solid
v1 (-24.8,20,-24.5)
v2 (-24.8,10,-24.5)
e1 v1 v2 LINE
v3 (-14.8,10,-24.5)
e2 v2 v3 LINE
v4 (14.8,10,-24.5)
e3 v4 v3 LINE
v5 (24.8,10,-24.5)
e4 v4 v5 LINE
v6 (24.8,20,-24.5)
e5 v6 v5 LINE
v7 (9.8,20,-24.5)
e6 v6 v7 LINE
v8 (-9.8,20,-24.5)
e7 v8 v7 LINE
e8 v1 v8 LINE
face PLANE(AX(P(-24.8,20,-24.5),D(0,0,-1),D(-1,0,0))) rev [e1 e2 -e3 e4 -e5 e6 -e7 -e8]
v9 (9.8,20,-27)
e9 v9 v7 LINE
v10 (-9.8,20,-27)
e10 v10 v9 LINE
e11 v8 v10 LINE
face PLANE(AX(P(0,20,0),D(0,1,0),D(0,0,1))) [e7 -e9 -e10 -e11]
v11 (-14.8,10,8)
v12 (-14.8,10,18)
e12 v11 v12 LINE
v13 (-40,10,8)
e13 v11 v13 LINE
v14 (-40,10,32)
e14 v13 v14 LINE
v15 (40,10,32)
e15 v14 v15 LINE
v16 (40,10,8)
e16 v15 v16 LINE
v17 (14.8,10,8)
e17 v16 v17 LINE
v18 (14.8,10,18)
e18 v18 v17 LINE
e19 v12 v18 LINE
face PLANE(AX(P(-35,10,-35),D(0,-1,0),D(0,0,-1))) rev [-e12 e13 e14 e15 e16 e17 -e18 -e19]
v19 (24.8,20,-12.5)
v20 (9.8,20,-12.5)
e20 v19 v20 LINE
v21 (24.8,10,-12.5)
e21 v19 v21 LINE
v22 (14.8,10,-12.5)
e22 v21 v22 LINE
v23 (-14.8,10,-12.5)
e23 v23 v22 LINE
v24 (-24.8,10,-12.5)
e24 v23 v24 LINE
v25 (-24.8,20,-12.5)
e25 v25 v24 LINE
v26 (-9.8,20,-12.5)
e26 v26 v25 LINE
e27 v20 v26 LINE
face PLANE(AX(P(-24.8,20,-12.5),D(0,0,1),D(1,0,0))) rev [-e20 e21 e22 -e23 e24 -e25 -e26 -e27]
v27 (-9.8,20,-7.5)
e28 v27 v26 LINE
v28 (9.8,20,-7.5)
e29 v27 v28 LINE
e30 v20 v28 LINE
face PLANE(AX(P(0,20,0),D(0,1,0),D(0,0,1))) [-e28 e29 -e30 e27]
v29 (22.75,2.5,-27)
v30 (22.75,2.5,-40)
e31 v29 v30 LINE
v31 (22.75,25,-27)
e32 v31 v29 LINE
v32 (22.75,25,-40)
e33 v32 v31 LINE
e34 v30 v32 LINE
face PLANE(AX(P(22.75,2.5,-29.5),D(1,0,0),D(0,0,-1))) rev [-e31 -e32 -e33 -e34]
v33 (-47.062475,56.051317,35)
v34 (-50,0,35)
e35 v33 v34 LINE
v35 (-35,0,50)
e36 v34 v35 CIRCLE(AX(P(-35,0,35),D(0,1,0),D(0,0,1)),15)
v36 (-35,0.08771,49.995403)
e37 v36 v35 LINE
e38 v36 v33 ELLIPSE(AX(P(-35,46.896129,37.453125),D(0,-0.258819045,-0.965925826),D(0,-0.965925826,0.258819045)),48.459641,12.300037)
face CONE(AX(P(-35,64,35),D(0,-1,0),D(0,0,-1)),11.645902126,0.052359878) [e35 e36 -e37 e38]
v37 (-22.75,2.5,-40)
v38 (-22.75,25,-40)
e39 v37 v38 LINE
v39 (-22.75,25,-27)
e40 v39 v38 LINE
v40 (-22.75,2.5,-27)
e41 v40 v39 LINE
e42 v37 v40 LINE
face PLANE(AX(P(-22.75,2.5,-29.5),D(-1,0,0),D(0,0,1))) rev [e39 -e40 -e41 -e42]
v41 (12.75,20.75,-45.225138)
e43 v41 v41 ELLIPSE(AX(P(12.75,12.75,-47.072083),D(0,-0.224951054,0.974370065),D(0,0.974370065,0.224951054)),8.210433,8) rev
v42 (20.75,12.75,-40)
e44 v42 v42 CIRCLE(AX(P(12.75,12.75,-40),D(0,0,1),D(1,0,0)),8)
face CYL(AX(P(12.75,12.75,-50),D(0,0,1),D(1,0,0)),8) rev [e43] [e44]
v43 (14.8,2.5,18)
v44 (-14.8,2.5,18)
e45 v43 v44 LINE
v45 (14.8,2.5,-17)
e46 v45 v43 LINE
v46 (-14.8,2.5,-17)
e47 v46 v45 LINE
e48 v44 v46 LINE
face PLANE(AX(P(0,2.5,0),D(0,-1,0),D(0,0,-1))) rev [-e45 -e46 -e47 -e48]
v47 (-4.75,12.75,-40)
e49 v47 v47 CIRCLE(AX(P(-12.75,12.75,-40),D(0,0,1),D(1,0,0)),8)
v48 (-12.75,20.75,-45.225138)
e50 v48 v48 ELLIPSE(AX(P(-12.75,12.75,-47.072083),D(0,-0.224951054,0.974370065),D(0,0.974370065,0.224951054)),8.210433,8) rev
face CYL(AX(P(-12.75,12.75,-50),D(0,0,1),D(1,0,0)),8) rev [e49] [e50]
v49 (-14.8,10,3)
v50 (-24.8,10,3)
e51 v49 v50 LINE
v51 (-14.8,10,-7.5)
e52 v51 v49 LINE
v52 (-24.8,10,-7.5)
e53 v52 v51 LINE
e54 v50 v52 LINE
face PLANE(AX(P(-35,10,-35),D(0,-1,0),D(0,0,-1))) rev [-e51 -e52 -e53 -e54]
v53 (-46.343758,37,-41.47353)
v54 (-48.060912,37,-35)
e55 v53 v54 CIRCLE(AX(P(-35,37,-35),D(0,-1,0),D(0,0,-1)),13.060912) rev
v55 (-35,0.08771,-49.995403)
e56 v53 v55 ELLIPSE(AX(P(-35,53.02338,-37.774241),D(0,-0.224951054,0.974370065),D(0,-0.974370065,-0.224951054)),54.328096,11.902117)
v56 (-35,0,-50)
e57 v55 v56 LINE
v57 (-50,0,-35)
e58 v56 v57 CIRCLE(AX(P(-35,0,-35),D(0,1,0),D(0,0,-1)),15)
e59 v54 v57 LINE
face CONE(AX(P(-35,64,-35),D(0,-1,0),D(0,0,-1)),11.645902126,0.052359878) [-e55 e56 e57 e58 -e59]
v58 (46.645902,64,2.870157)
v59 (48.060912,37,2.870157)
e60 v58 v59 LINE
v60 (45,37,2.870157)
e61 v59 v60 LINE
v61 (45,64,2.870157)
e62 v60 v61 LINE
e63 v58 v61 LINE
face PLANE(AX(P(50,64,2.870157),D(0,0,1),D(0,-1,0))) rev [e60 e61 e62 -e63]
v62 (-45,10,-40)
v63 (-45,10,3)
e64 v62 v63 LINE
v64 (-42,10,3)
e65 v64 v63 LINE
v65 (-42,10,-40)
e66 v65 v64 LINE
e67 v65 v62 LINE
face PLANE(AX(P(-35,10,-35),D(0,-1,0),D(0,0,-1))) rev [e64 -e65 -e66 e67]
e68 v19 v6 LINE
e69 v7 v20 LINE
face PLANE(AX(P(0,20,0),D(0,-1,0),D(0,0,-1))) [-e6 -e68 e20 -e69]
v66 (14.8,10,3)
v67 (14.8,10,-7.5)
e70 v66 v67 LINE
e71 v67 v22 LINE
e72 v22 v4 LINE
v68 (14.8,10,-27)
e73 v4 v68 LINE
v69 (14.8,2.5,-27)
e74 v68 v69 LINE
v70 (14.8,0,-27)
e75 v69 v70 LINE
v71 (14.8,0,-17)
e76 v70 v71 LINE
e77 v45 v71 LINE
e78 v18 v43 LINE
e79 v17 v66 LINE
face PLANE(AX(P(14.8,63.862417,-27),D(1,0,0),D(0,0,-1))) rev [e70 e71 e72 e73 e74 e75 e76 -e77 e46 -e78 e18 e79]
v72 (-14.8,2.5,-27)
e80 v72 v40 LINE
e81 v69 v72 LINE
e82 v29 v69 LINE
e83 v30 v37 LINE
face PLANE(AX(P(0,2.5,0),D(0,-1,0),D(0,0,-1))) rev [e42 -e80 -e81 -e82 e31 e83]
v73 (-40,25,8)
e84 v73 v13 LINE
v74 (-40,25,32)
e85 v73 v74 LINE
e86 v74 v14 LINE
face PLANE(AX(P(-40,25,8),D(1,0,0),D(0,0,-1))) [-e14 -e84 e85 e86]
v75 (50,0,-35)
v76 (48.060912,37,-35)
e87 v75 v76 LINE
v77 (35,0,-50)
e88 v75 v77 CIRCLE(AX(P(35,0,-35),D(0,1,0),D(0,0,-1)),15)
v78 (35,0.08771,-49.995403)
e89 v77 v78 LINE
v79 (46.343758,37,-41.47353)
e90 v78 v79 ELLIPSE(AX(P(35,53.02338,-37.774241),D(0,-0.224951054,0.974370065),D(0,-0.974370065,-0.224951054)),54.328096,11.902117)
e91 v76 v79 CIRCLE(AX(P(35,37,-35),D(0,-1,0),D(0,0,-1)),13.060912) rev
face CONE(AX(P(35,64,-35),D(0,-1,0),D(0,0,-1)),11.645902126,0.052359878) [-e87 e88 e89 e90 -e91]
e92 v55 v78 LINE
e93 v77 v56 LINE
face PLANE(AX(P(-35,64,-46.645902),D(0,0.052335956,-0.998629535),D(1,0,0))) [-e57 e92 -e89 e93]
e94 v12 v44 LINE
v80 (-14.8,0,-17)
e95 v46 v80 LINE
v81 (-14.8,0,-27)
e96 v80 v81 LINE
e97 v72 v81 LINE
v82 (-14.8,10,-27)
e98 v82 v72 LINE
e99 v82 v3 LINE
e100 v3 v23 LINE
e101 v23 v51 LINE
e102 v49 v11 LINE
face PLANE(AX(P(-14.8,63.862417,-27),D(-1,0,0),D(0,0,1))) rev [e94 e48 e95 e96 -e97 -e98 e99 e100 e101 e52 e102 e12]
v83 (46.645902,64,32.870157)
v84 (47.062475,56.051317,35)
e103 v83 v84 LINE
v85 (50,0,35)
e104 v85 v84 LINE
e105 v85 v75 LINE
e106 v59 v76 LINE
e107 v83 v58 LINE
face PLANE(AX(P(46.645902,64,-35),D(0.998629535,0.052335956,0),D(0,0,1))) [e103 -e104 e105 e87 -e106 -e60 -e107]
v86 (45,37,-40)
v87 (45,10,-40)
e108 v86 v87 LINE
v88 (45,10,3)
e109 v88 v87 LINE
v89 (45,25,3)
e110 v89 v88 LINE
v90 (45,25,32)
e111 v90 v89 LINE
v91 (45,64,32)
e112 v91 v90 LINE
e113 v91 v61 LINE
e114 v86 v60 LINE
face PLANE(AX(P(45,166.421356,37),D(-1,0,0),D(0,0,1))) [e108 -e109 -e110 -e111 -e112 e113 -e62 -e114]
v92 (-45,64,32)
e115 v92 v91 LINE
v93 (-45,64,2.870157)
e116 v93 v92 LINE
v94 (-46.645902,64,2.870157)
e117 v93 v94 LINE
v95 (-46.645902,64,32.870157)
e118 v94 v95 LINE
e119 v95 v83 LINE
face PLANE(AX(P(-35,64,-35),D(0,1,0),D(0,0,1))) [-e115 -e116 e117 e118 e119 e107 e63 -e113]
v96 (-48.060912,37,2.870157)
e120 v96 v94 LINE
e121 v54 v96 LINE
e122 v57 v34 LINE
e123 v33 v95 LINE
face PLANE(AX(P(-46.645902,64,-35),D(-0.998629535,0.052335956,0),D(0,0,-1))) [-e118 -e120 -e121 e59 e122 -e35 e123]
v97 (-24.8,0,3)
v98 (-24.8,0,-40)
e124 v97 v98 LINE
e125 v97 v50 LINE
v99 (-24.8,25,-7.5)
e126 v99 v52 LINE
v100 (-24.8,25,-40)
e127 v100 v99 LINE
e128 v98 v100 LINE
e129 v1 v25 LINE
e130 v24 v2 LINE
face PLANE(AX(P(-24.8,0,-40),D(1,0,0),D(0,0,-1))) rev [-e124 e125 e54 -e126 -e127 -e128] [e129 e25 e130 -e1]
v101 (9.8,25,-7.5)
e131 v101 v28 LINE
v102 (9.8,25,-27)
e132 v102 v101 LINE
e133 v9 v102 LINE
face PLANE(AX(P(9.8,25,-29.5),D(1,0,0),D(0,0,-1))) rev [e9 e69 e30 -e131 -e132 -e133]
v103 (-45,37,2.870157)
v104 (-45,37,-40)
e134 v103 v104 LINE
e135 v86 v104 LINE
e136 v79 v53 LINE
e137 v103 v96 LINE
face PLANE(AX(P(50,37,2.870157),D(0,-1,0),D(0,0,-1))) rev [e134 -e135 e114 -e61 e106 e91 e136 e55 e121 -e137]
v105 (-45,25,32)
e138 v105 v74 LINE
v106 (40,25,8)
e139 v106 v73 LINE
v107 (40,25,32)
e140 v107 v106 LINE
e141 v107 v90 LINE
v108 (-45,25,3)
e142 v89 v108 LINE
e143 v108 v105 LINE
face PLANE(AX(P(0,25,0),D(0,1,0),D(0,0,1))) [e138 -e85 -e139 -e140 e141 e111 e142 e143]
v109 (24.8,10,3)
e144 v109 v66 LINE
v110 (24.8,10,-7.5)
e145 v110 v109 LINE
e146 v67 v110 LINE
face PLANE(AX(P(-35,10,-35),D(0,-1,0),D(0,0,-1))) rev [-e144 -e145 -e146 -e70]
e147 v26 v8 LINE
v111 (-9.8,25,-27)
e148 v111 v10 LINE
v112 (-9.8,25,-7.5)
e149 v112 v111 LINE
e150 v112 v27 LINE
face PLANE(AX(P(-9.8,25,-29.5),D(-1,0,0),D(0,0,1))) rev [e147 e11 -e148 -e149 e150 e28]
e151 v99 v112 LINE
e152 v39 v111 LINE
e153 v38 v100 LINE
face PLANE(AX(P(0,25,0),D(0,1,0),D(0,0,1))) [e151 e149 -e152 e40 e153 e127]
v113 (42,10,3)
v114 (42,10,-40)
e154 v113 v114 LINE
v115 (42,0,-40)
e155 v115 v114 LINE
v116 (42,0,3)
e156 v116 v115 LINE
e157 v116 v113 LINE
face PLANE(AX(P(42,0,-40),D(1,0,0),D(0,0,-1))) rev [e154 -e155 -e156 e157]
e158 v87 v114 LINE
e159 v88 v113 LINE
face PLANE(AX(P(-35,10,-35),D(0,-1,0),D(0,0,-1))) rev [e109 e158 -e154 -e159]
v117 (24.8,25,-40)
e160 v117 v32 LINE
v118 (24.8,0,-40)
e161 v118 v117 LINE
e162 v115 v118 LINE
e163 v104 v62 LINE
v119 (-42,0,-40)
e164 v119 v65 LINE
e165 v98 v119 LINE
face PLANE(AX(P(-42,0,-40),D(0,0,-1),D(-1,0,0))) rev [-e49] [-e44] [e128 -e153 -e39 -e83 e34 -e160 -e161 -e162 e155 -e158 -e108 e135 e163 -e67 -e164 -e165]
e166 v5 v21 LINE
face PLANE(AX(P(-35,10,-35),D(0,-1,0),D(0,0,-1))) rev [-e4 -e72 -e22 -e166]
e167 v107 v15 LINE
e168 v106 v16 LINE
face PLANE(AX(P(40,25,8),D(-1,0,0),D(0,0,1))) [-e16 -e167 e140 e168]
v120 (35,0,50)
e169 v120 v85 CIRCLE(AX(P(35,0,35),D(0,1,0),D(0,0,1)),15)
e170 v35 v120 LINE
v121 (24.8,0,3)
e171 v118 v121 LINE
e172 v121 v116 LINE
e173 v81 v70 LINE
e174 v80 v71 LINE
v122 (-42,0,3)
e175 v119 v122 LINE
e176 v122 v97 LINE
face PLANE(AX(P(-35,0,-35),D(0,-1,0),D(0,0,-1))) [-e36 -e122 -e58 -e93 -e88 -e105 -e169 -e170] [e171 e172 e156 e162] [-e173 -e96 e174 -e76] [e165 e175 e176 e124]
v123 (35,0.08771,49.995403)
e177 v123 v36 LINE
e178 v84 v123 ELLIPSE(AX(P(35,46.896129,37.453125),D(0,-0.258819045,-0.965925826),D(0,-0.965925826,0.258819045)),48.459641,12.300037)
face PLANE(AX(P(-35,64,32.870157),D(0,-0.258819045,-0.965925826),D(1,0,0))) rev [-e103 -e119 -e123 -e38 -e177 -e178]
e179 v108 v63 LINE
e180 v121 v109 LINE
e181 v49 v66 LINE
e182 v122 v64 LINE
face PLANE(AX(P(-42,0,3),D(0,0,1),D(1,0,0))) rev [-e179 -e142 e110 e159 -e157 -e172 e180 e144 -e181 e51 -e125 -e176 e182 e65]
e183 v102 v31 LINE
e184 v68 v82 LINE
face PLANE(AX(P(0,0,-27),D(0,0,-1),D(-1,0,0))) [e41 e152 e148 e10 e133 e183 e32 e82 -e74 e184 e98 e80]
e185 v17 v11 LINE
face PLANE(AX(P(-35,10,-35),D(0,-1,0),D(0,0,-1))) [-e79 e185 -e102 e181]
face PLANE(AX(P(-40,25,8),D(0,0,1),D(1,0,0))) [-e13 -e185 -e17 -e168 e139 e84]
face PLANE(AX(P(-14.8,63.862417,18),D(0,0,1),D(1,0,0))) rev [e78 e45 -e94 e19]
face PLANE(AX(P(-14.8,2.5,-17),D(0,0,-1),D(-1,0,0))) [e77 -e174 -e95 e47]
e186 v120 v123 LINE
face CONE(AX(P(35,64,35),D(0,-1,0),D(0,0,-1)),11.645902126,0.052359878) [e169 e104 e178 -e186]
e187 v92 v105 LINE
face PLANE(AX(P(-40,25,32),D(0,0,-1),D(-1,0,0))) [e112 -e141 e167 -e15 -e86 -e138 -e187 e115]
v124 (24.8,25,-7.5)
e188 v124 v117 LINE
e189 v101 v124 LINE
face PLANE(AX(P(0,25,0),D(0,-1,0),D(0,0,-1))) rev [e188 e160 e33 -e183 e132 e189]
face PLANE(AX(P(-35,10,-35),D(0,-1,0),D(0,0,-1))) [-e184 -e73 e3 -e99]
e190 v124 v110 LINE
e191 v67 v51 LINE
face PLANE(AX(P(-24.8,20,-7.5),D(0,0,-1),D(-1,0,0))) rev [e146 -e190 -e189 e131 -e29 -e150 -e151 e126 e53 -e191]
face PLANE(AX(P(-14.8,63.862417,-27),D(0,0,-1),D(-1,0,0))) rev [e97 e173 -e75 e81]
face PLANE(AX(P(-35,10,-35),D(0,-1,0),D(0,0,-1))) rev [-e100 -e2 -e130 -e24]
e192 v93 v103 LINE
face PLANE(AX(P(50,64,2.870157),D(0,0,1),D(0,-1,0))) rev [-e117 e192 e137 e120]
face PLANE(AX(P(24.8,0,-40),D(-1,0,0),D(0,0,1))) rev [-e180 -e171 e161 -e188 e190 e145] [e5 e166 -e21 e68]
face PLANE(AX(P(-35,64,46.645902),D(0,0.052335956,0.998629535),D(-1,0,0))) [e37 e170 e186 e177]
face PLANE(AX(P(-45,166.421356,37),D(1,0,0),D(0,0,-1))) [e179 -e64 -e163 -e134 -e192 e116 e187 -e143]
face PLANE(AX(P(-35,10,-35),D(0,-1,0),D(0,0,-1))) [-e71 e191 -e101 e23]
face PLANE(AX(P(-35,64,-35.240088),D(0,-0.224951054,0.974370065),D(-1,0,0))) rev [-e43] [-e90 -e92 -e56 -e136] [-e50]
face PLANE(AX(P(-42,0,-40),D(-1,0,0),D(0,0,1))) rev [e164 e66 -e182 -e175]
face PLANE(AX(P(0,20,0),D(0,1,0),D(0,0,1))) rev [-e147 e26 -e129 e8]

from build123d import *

# Parameters (mm, degrees)
BOSS_EXTRUDE1_DEPTH     = 10
SKETCH2_W               = 17.2
SKETCH2_H               = 43
CUT_EXTRUDE1_DEPTH      = 72.414284285
SKETCH3_W               = 90
SKETCH3_H               = 34
SKETCH3_W_2             = 80
SKETCH3_H_2             = 24
BOSS_EXTRUDE3_DEPTH     = 15
SKETCH4_W               = 49.6
SKETCH4_H               = 5
BOSS_EXTRUDE4_DEPTH     = 10
SKETCH5_W               = 15
SKETCH5_H               = 22
BOSS_EXTRUDE5_DEPTH     = 5
SKETCH6_W               = 90
SKETCH6_H               = 77
BOSS_EXTRUDE6_DEPTH     = 15
BOSS_EXTRUDE8_DEPTH     = 39
CHAMFER1_SIZE           = 64
CHAMFER1_SIZE_2         = 3.354097874
CHAMFER2_SIZE           = 64
CHAMFER2_SIZE_2         = 11.405813635
CHAMFER3_SIZE           = 64
CHAMFER3_SIZE_2         = 13.775745352
CUT_EXTRUDE3_DEPTH      = 95.500525601
CUT_EXTRUDE3_DEPTH_BACK = 95.500525601
SKETCH10_W              = 50
SKETCH10_H              = 27
SKETCH11_W              = 45.5
SKETCH11_H              = 10.5
CUT_EXTRUDE4_DEPTH      = 7.5
SKETCH14_W              = 2.05
SKETCH14_H              = 10.5
BOSS_EXTRUDE9_DEPTH     = 15
SKETCH15_R              = 8
CUT_EXTRUDE5_DEPTH      = 122.227059686
CUT_EXTRUDE6_DEPTH      = 2.5
CUT_EXTRUDE7_REACH      = 97.373
SKETCH18_W              = 29.6
SKETCH18_H              = 45
CUT_EXTRUDE8_DEPTH      = 15
SKETCH21_W              = 29.6
SKETCH21_H              = 35
BOSS_EXTRUDE10_DEPTH    = 2.5


with BuildPart() as part:
    # Sketch1 → Boss-Extrude1 (new body)
    with BuildSketch(Plane(origin=(0, 0, 0), x_dir=(1, 0, 0), z_dir=(0, 1, 0))):
        with BuildLine():
            Line((-35, 50), (35, 50))
            ThreePointArc((35, 50), (45.606601718, 45.606601718), (50, 35))
            Line((50, 35), (50, -35))
            ThreePointArc((50, -35), (45.606601718, -45.606601718), (35, -50))
            Line((35, -50), (-35, -50))
            ThreePointArc((-35, -50), (-45.606601718, -45.606601718), (-50, -35))
            Line((-50, -35), (-50, 35))
            ThreePointArc((-50, 35), (-45.606601718, 45.606601718), (-35, 50))
        make_face()
    extrude(amount=BOSS_EXTRUDE1_DEPTH)

    # Sketch2 → Cut-Extrude1 (cut, through all)
    with BuildSketch(Plane(origin=(0, 10, 0), x_dir=(1, 0, 0), z_dir=(0, 1, 0))):
        with Locations((-33.4, 18.5)):
            Rectangle(SKETCH2_W, SKETCH2_H)
        with Locations((33.4, 18.5)):
            Rectangle(SKETCH2_W, SKETCH2_H)
    extrude(amount=-CUT_EXTRUDE1_DEPTH, mode=Mode.SUBTRACT)

    # Sketch3 → Boss-Extrude3 (add)
    with BuildSketch(Plane(origin=(0, 10, 0), x_dir=(1, 0, 0), z_dir=(0, 1, 0))):
        with Locations((0, -20)):
            Rectangle(SKETCH3_W, SKETCH3_H)
        with Locations((0, -20)):
            Rectangle(SKETCH3_W_2, SKETCH3_H_2, mode=Mode.SUBTRACT)
    extrude(amount=BOSS_EXTRUDE3_DEPTH)

    # Sketch4 → Boss-Extrude4 (add)
    with BuildSketch(Plane(origin=(0, 10, 0), x_dir=(1, 0, 0), z_dir=(0, 1, 0))):
        with Locations((0, 10)):
            Rectangle(SKETCH4_W, SKETCH4_H)
        with Locations((0, 27)):
            Rectangle(SKETCH4_W, SKETCH4_H)
    extrude(amount=BOSS_EXTRUDE4_DEPTH)

    # Sketch5 → Boss-Extrude5 (add)
    with BuildSketch(Plane(origin=(0, 20, 0), x_dir=(1, 0, 0), z_dir=(0, 1, 0))):
        with Locations((-17.3, 18.5)):
            Rectangle(SKETCH5_W, SKETCH5_H)
        with Locations((17.3, 18.5)):
            Rectangle(SKETCH5_W, SKETCH5_H)
    extrude(amount=BOSS_EXTRUDE5_DEPTH)

    # Sketch6 → Boss-Extrude6 (add)
    with BuildSketch(Plane(origin=(0, 10, 0), x_dir=(1, 0, 0), z_dir=(0, 1, 0))):
        with BuildLine():
            Line((-50, 35), (-50, -35))
            ThreePointArc((-50, -35), (-45.606601718, -45.606601718), (-35, -50))
            Line((-35, -50), (35, -50))
            ThreePointArc((35, -50), (45.606601718, -45.606601718), (50, -35))
            Line((50, -35), (50, 35))
            ThreePointArc((50, 35), (45.606601718, 45.606601718), (35, 50))
            Line((35, 50), (-35, 50))
            ThreePointArc((-35, 50), (-45.606601718, 45.606601718), (-50, 35))
        make_face()
        with Locations((0, 1.5)):
            Rectangle(SKETCH6_W, SKETCH6_H, mode=Mode.SUBTRACT)
    extrude(amount=BOSS_EXTRUDE6_DEPTH)

    # Sketch9 → Boss-Extrude8 (add)
    with BuildSketch(Plane(origin=(0, 25, 0), x_dir=(1, 0, 0), z_dir=(0, 1, 0))):
        with BuildLine():
            Line((-50, 35), (-50, -35))
            ThreePointArc((-50, -35), (-45.606601718, -45.606601718), (-35, -50))
            Line((-35, -50), (35, -50))
            ThreePointArc((35, -50), (45.606601718, -45.606601718), (50, -35))
            Line((50, -35), (50, 35))
            ThreePointArc((50, 35), (45.606601718, 45.606601718), (35, 50))
            Line((35, 50), (-35, 50))
            ThreePointArc((-35, 50), (-45.606601718, 45.606601718), (-50, 35))
        make_face()
        with BuildLine():
            Line((-45, 35), (-45, -32))
            Line((-45, -32), (45, -32))
            Line((45, -32), (45, 35))
            ThreePointArc((45, 35), (44.659258263, 37.588190451), (43.660254038, 40))
            Line((43.660254038, 40), (-43.660254038, 40))
            ThreePointArc((-43.660254038, 40), (-44.659258263, 37.588190451), (-45, 35))
        make_face(mode=Mode.SUBTRACT)
    extrude(amount=BOSS_EXTRUDE8_DEPTH)

    # Chamfer1
    # the kernel refuses this chamfer: 64, 3.354097874 mm, written as the material it takes off along each edge
    with BuildSketch(Plane(origin=(-35, 64, 50), x_dir=(0, -0.9999979738662979, 0.002013023422382214), z_dir=(1, 0, 0)), Plane(origin=(50, 64, 35), x_dir=(0.002013023422382214, -0.9999979738662979, 0), z_dir=(0, 0, -1)), Plane(origin=(-50, 64, -35), x_dir=(-0.002013023422382214, -0.9999979738662979, 0), z_dir=(0, 0, 1)), Plane(origin=(35, 64, -50), x_dir=(0, -0.9999979738662979, -0.002013023422382214), z_dir=(-1, 0, 0))) as chamfer1_piece_1:
        Polygon((CHAMFER1_SIZE * 0.999997973866, CHAMFER1_SIZE * 0.00201302342238), (-CHAMFER1_SIZE_2 * 0.00201302342245, CHAMFER1_SIZE_2 * 0.9999979739), (0, 0), align=None)
    extrude(amount=70, mode=Mode.SUBTRACT)
    with BuildSketch(Plane(origin=(35, 64, 35), x_dir=(0, 0, 1), z_dir=(-1, 0, 0))) as chamfer1_piece_2:
        Polygon((15, -CHAMFER1_SIZE), (15 - CHAMFER1_SIZE_2, 0), (15, 0), align=None)
    revolve(axis=Axis((35, 64, 35), (0, 1, 0)), revolution_arc=90, mode=Mode.SUBTRACT)
    with BuildSketch(Plane(origin=(-35, 64, 35), x_dir=(-1, 0, 0), z_dir=(0, 0, -1))) as chamfer1_piece_3:
        Polygon((15, -CHAMFER1_SIZE), (15 - CHAMFER1_SIZE_2, 0), (15, 0), align=None)
    revolve(axis=Axis((-35, 64, 35), (0, 1, 0)), revolution_arc=90, mode=Mode.SUBTRACT)
    with BuildSketch(Plane(origin=(35, 64, -35), x_dir=(1, 0, 0), z_dir=(0, 0, 1))) as chamfer1_piece_4:
        Polygon((15, -CHAMFER1_SIZE), (15 - CHAMFER1_SIZE_2, 0), (15, 0), align=None)
    revolve(axis=Axis((35, 64, -35), (0, 1, 0)), revolution_arc=90, mode=Mode.SUBTRACT)
    with BuildSketch(Plane(origin=(-35, 64, -35), x_dir=(0, 0, -1), z_dir=(1, 0, 0))) as chamfer1_piece_5:
        Polygon((15 - CHAMFER1_SIZE_2, 0), (15, -CHAMFER1_SIZE), (15, 0), align=None)
    revolve(axis=Axis((-35, 64, -35), (0, 1, 0)), revolution_arc=90, mode=Mode.SUBTRACT)

    # Chamfer2
    # the kernel refuses this chamfer: 64, 11.405813635 mm, written as the material it takes off along each edge
    with BuildSketch(Plane(origin=(201.306482971, 64, -46.645902126), x_dir=(0, -0.9982575003065525, -0.05900816114499234), z_dir=(-1, 0, 0))) as chamfer2_piece_1:
        Polygon((CHAMFER2_SIZE * 0.999977671636, CHAMFER2_SIZE * 0.0066825316561), (-CHAMFER2_SIZE_2 * 0.0590081611462, CHAMFER2_SIZE_2 * 0.998257500326), (0, 0), align=None)
    extrude(amount=402.612965942, mode=Mode.SUBTRACT)

    # Chamfer3
    # the kernel refuses this chamfer: 64, 13.775745352 mm, written as the material it takes off along each edge
    with BuildSketch(Plane(origin=(-201.265469314, 64, 46.645902126), x_dir=(0, -0.9981787050157903, 0.06032638604292662), z_dir=(1, 0, 0))) as chamfer3_piece_1:
        Polygon((CHAMFER3_SIZE * 0.999967974892, CHAMFER3_SIZE * 0.00800307379952), (-CHAMFER3_SIZE_2 * 0.060326386045, CHAMFER3_SIZE_2 * 0.99817870505), (0, 0), align=None)
    extrude(amount=402.530938629, mode=Mode.SUBTRACT)

    # Sketch10 → Cut-Extrude3 (cut, two sides: drawn at the far end of the back side and taken through both)
    with BuildSketch(Plane(origin=(0, 1.307501734, 0), x_dir=(0, 0, 1), z_dir=(-1, 0, 0)).offset(-CUT_EXTRUDE3_DEPTH_BACK)):
        with Locations((-22.129843227, 49.192498266)):
            Rectangle(SKETCH10_W, SKETCH10_H)
    extrude(amount=CUT_EXTRUDE3_DEPTH + CUT_EXTRUDE3_DEPTH_BACK, mode=Mode.SUBTRACT)

    # Sketch11 → Cut-Extrude4 (cut)
    with BuildSketch(Plane(origin=(0, 10, 0), x_dir=(1, 0, 0), z_dir=(0, 1, 0))):
        with Locations((0, 34.75)):
            Rectangle(SKETCH11_W, SKETCH11_H)
    extrude(amount=-CUT_EXTRUDE4_DEPTH, mode=Mode.SUBTRACT)

    # Sketch14 → Boss-Extrude9 (add)
    with BuildSketch(Plane(origin=(0, 10, 0), x_dir=(1, 0, 0), z_dir=(0, 1, 0))):
        with Locations((-23.775, 34.75)):
            Rectangle(SKETCH14_W, SKETCH14_H)
        with Locations((23.775, 34.75)):
            Rectangle(SKETCH14_W, SKETCH14_H)
    extrude(amount=BOSS_EXTRUDE9_DEPTH)

    # Sketch15 → Cut-Extrude5 (cut, through all)
    with BuildSketch(Plane.XY.offset(-40)):
        with Locations((-12.75, 12.75)):
            Circle(SKETCH15_R)
        with Locations((12.75, 12.75)):
            Circle(SKETCH15_R)
    extrude(amount=-CUT_EXTRUDE5_DEPTH, mode=Mode.SUBTRACT)

    # Sketch17 → Cut-Extrude6 (cut)
    with BuildSketch(Plane(origin=(0, 0, -29.5), x_dir=(-1, 0, 0), z_dir=(0, 0, -1))):
        Polygon((-9.8, 25), (-22.75, 25), (-22.75, 2.5), (22.75, 2.5), (22.75, 25), (9.8, 25), (9.8, 20), (-9.8, 20), align=None)
    extrude(amount=-CUT_EXTRUDE6_DEPTH, mode=Mode.SUBTRACT)

    # Cut-Extrude7: up to this face of the body (flat: up to its plane)
    cut_extrude7_end = Plane(part.part.faces().sort_by_distance((0, 10, -18.5))[0])
    # Sketch18 → Cut-Extrude7 (cut, up to the picked face)
    with BuildSketch(Plane.XZ, mode=Mode.PRIVATE) as cut_extrude7_sk1:
        with Locations((0, -4.5)):
            Rectangle(SKETCH18_W, SKETCH18_H)
    cut_extrude7_tool1 = split(extrude(cut_extrude7_sk1.sketch, amount=-CUT_EXTRUDE7_REACH, mode=Mode.PRIVATE), bisect_by=cut_extrude7_end, keep=Keep.BOTH, mode=Mode.PRIVATE)
    add(cut_extrude7_tool1.solids().sort_by(Axis((0, 0, -4.5), (0, 1, 0)))[0], mode=Mode.SUBTRACT)

    # Sketch20 → Cut-Extrude8 (cut)
    with BuildSketch(Plane.XZ.offset(-25)):
        with BuildLine():
            Line((-45, -35), (-45, -40))
            Line((-45, -40), (-43.660254038, -40))
            ThreePointArc((-43.660254038, -40), (-44.659258263, -37.588190451), (-45, -35))
        make_face()
        with BuildLine():
            Line((45, -40), (45, -35))
            ThreePointArc((45, -35), (44.659258263, -37.588190451), (43.660254038, -40))
            Line((43.660254038, -40), (45, -40))
        make_face()
    extrude(amount=-CUT_EXTRUDE8_DEPTH, mode=Mode.SUBTRACT)

    # Sketch21 → Boss-Extrude10 (add)
    with BuildSketch(Plane.XZ):
        with Locations((0, 0.5)):
            Rectangle(SKETCH21_W, SKETCH21_H)
    extrude(amount=-BOSS_EXTRUDE10_DEPTH)


solid = part.part
